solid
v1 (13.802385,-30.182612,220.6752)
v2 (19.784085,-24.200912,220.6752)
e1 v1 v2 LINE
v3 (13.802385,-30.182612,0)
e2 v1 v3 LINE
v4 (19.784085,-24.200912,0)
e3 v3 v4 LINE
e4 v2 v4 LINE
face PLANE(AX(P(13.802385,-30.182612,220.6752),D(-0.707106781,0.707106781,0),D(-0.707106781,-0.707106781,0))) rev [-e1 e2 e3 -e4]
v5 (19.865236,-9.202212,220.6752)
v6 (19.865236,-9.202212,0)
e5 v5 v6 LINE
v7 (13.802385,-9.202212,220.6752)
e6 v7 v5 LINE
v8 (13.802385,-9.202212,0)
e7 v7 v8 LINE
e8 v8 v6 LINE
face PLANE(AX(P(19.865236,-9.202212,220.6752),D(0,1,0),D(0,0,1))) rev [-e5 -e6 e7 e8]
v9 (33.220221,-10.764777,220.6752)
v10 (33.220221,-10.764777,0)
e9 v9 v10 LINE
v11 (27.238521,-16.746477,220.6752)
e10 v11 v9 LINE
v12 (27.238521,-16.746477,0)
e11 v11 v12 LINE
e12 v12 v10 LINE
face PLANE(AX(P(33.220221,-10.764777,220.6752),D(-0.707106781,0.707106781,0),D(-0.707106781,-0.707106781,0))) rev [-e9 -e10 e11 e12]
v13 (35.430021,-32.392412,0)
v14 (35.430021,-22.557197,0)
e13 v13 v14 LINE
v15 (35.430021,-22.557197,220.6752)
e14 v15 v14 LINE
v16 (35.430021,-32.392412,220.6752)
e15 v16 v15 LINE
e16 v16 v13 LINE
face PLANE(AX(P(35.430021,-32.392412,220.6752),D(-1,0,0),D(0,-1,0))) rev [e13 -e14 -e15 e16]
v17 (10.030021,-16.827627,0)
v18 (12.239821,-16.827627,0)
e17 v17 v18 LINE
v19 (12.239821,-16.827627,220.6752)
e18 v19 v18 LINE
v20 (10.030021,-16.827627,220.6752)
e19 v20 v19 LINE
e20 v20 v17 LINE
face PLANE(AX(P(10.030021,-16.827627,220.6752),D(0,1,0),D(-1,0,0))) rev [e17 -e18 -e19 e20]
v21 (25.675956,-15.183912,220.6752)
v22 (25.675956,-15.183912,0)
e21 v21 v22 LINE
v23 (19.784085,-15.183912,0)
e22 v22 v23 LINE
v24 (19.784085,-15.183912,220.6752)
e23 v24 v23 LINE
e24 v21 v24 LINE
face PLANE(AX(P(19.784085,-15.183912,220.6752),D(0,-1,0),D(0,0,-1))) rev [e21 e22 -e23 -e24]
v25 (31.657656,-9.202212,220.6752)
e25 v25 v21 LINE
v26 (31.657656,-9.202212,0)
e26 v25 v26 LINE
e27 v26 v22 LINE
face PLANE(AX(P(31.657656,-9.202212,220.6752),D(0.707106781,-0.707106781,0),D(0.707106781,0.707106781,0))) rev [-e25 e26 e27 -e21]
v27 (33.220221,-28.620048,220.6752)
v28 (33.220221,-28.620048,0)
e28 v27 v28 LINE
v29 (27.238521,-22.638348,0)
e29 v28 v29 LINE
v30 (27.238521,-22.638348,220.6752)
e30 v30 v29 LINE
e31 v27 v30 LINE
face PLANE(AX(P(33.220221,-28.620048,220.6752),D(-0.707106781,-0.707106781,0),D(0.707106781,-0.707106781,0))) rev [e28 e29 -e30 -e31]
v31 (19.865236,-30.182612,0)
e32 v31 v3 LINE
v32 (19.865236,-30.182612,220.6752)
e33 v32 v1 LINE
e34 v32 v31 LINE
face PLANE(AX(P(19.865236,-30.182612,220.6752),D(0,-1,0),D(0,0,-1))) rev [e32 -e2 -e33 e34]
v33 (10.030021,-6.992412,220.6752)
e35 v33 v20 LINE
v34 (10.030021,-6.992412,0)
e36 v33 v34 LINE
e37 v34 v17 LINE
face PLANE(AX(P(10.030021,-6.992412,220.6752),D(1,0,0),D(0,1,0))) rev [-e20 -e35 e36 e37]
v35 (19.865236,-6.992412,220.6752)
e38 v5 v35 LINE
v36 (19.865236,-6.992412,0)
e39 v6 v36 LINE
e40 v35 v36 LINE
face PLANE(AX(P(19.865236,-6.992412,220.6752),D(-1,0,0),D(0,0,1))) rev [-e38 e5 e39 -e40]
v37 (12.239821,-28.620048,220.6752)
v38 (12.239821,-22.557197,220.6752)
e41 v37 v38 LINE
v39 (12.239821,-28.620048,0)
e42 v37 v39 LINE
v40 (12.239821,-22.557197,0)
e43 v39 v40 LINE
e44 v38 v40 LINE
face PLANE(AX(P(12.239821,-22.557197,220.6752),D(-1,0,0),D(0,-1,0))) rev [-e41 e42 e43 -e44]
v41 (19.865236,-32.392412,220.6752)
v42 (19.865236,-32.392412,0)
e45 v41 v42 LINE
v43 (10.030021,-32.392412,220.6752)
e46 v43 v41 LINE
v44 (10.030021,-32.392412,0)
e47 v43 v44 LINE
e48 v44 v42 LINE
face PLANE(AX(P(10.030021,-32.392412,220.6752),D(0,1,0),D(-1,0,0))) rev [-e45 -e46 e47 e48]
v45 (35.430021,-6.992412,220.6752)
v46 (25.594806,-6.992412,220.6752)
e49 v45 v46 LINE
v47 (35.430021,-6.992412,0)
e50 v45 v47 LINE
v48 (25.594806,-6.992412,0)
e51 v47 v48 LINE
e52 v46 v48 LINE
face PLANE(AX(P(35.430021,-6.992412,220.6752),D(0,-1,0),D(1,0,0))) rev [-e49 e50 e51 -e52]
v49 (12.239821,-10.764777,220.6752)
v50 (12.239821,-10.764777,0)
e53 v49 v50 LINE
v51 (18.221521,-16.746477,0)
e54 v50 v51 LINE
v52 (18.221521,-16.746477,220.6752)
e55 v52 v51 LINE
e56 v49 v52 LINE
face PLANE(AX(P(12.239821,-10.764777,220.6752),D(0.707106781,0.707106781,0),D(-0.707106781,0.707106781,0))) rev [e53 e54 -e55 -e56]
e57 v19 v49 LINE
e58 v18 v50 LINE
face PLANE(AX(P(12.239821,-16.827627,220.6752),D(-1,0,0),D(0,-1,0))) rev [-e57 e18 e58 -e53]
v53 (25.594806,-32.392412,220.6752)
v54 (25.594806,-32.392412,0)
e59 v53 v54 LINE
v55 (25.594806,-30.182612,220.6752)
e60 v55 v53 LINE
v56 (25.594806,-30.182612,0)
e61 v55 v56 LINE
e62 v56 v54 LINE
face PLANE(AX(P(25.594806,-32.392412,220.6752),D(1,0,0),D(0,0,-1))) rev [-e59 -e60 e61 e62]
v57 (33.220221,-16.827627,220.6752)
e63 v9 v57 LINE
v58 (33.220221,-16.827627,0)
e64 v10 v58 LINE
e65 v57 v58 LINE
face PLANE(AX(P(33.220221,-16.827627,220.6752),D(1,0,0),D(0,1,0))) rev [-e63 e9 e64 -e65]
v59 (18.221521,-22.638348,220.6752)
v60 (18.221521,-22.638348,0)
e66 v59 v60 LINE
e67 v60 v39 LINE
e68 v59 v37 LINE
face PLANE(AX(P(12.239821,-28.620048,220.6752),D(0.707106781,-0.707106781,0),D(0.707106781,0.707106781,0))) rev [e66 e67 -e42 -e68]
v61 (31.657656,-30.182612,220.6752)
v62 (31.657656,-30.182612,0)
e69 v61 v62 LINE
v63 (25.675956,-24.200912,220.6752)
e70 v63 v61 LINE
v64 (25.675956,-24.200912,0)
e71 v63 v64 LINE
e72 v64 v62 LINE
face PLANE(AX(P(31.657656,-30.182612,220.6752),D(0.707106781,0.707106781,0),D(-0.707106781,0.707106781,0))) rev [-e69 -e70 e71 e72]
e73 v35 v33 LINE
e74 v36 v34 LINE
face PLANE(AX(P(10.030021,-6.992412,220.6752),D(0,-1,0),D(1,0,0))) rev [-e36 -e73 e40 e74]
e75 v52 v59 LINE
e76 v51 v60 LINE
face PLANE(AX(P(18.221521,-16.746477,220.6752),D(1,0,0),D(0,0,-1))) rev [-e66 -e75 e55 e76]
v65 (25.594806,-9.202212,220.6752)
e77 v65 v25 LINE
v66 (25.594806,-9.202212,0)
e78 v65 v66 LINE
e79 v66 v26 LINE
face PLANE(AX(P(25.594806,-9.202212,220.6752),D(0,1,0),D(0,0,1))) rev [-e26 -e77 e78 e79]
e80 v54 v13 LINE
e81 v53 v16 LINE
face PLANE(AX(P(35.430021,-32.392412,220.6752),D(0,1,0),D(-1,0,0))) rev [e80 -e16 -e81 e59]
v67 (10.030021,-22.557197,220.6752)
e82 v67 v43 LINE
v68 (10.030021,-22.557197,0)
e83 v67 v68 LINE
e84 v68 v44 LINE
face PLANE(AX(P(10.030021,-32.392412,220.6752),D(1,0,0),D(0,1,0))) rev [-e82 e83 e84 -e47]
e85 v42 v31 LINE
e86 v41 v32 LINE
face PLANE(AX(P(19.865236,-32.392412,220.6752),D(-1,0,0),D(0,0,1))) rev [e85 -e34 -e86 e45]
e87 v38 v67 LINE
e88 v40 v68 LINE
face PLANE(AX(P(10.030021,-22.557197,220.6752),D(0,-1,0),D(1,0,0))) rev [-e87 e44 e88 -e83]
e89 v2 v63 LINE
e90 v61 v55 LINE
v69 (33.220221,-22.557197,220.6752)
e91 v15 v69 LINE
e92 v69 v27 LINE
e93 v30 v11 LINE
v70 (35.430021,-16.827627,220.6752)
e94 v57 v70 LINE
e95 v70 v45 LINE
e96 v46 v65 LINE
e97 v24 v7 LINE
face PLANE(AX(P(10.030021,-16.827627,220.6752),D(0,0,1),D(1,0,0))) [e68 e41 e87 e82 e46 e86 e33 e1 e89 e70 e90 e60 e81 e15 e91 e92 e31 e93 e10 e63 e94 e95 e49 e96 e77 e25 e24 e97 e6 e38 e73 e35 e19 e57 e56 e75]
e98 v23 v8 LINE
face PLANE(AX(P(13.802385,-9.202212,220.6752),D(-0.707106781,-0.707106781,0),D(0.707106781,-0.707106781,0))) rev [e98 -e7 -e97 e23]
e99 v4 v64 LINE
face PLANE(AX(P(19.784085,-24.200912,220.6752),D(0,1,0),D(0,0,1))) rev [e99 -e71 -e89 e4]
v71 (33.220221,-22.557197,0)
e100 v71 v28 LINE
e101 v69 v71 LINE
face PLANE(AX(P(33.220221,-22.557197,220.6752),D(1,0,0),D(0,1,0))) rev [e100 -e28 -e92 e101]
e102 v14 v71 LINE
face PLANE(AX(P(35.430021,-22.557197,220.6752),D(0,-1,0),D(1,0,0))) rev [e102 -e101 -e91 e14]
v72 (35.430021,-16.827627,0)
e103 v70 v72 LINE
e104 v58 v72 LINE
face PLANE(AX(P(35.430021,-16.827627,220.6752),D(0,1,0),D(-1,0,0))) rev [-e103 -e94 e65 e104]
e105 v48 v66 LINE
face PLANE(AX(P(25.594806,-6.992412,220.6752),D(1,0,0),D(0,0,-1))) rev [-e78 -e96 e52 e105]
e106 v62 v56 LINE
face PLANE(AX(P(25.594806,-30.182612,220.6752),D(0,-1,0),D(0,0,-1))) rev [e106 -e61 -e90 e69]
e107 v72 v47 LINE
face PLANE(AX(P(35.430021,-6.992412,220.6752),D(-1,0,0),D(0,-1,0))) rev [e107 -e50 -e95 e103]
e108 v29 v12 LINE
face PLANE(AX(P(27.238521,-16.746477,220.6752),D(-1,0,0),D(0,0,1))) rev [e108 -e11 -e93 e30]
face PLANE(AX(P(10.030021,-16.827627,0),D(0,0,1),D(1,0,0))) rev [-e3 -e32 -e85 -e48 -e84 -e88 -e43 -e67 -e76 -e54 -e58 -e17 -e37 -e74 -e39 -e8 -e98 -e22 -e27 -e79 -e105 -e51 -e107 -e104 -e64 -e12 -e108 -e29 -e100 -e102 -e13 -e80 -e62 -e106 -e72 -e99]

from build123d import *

# Parameters (mm, degrees)
EXTRUDE1_DEPTH = 220.6752


# Read off the part's stored shape, not the designer's step: 1010<1>
with BuildPart() as part:
    # Sketch1<2> → Extrude1 (new body)
    with BuildSketch(Plane.XY):
        Polygon((10.030020765, -6.992412451), (19.865235782, -6.992412451), (19.865235782, -9.202212451), (13.80238533, -9.202212451), (19.78408533, -15.183912451), (25.6759562, -15.183912451), (31.6576562, -9.202212451), (25.594805747, -9.202212451), (25.594805747, -6.992412451), (35.430020765, -6.992412451), (35.430020765, -16.827627469), (33.220220765, -16.827627469), (33.220220765, -10.764777016), (27.238520765, -16.746477016), (27.238520765, -22.638347886), (33.220220765, -28.620047886), (33.220220765, -22.557197434), (35.430020765, -22.557197434), (35.430020765, -32.392412451), (25.594805747, -32.392412451), (25.594805747, -30.182612451), (31.6576562, -30.182612451), (25.6759562, -24.200912451), (19.78408533, -24.200912451), (13.80238533, -30.182612451), (19.865235782, -30.182612451), (19.865235782, -32.392412451), (10.030020765, -32.392412451), (10.030020765, -22.557197434), (12.239820765, -22.557197434), (12.239820765, -28.620047886), (18.221520765, -22.638347886), (18.221520765, -16.746477016), (12.239820765, -10.764777016), (12.239820765, -16.827627469), (10.030020765, -16.827627469), align=None)
    extrude(amount=EXTRUDE1_DEPTH)


solid = part.part
